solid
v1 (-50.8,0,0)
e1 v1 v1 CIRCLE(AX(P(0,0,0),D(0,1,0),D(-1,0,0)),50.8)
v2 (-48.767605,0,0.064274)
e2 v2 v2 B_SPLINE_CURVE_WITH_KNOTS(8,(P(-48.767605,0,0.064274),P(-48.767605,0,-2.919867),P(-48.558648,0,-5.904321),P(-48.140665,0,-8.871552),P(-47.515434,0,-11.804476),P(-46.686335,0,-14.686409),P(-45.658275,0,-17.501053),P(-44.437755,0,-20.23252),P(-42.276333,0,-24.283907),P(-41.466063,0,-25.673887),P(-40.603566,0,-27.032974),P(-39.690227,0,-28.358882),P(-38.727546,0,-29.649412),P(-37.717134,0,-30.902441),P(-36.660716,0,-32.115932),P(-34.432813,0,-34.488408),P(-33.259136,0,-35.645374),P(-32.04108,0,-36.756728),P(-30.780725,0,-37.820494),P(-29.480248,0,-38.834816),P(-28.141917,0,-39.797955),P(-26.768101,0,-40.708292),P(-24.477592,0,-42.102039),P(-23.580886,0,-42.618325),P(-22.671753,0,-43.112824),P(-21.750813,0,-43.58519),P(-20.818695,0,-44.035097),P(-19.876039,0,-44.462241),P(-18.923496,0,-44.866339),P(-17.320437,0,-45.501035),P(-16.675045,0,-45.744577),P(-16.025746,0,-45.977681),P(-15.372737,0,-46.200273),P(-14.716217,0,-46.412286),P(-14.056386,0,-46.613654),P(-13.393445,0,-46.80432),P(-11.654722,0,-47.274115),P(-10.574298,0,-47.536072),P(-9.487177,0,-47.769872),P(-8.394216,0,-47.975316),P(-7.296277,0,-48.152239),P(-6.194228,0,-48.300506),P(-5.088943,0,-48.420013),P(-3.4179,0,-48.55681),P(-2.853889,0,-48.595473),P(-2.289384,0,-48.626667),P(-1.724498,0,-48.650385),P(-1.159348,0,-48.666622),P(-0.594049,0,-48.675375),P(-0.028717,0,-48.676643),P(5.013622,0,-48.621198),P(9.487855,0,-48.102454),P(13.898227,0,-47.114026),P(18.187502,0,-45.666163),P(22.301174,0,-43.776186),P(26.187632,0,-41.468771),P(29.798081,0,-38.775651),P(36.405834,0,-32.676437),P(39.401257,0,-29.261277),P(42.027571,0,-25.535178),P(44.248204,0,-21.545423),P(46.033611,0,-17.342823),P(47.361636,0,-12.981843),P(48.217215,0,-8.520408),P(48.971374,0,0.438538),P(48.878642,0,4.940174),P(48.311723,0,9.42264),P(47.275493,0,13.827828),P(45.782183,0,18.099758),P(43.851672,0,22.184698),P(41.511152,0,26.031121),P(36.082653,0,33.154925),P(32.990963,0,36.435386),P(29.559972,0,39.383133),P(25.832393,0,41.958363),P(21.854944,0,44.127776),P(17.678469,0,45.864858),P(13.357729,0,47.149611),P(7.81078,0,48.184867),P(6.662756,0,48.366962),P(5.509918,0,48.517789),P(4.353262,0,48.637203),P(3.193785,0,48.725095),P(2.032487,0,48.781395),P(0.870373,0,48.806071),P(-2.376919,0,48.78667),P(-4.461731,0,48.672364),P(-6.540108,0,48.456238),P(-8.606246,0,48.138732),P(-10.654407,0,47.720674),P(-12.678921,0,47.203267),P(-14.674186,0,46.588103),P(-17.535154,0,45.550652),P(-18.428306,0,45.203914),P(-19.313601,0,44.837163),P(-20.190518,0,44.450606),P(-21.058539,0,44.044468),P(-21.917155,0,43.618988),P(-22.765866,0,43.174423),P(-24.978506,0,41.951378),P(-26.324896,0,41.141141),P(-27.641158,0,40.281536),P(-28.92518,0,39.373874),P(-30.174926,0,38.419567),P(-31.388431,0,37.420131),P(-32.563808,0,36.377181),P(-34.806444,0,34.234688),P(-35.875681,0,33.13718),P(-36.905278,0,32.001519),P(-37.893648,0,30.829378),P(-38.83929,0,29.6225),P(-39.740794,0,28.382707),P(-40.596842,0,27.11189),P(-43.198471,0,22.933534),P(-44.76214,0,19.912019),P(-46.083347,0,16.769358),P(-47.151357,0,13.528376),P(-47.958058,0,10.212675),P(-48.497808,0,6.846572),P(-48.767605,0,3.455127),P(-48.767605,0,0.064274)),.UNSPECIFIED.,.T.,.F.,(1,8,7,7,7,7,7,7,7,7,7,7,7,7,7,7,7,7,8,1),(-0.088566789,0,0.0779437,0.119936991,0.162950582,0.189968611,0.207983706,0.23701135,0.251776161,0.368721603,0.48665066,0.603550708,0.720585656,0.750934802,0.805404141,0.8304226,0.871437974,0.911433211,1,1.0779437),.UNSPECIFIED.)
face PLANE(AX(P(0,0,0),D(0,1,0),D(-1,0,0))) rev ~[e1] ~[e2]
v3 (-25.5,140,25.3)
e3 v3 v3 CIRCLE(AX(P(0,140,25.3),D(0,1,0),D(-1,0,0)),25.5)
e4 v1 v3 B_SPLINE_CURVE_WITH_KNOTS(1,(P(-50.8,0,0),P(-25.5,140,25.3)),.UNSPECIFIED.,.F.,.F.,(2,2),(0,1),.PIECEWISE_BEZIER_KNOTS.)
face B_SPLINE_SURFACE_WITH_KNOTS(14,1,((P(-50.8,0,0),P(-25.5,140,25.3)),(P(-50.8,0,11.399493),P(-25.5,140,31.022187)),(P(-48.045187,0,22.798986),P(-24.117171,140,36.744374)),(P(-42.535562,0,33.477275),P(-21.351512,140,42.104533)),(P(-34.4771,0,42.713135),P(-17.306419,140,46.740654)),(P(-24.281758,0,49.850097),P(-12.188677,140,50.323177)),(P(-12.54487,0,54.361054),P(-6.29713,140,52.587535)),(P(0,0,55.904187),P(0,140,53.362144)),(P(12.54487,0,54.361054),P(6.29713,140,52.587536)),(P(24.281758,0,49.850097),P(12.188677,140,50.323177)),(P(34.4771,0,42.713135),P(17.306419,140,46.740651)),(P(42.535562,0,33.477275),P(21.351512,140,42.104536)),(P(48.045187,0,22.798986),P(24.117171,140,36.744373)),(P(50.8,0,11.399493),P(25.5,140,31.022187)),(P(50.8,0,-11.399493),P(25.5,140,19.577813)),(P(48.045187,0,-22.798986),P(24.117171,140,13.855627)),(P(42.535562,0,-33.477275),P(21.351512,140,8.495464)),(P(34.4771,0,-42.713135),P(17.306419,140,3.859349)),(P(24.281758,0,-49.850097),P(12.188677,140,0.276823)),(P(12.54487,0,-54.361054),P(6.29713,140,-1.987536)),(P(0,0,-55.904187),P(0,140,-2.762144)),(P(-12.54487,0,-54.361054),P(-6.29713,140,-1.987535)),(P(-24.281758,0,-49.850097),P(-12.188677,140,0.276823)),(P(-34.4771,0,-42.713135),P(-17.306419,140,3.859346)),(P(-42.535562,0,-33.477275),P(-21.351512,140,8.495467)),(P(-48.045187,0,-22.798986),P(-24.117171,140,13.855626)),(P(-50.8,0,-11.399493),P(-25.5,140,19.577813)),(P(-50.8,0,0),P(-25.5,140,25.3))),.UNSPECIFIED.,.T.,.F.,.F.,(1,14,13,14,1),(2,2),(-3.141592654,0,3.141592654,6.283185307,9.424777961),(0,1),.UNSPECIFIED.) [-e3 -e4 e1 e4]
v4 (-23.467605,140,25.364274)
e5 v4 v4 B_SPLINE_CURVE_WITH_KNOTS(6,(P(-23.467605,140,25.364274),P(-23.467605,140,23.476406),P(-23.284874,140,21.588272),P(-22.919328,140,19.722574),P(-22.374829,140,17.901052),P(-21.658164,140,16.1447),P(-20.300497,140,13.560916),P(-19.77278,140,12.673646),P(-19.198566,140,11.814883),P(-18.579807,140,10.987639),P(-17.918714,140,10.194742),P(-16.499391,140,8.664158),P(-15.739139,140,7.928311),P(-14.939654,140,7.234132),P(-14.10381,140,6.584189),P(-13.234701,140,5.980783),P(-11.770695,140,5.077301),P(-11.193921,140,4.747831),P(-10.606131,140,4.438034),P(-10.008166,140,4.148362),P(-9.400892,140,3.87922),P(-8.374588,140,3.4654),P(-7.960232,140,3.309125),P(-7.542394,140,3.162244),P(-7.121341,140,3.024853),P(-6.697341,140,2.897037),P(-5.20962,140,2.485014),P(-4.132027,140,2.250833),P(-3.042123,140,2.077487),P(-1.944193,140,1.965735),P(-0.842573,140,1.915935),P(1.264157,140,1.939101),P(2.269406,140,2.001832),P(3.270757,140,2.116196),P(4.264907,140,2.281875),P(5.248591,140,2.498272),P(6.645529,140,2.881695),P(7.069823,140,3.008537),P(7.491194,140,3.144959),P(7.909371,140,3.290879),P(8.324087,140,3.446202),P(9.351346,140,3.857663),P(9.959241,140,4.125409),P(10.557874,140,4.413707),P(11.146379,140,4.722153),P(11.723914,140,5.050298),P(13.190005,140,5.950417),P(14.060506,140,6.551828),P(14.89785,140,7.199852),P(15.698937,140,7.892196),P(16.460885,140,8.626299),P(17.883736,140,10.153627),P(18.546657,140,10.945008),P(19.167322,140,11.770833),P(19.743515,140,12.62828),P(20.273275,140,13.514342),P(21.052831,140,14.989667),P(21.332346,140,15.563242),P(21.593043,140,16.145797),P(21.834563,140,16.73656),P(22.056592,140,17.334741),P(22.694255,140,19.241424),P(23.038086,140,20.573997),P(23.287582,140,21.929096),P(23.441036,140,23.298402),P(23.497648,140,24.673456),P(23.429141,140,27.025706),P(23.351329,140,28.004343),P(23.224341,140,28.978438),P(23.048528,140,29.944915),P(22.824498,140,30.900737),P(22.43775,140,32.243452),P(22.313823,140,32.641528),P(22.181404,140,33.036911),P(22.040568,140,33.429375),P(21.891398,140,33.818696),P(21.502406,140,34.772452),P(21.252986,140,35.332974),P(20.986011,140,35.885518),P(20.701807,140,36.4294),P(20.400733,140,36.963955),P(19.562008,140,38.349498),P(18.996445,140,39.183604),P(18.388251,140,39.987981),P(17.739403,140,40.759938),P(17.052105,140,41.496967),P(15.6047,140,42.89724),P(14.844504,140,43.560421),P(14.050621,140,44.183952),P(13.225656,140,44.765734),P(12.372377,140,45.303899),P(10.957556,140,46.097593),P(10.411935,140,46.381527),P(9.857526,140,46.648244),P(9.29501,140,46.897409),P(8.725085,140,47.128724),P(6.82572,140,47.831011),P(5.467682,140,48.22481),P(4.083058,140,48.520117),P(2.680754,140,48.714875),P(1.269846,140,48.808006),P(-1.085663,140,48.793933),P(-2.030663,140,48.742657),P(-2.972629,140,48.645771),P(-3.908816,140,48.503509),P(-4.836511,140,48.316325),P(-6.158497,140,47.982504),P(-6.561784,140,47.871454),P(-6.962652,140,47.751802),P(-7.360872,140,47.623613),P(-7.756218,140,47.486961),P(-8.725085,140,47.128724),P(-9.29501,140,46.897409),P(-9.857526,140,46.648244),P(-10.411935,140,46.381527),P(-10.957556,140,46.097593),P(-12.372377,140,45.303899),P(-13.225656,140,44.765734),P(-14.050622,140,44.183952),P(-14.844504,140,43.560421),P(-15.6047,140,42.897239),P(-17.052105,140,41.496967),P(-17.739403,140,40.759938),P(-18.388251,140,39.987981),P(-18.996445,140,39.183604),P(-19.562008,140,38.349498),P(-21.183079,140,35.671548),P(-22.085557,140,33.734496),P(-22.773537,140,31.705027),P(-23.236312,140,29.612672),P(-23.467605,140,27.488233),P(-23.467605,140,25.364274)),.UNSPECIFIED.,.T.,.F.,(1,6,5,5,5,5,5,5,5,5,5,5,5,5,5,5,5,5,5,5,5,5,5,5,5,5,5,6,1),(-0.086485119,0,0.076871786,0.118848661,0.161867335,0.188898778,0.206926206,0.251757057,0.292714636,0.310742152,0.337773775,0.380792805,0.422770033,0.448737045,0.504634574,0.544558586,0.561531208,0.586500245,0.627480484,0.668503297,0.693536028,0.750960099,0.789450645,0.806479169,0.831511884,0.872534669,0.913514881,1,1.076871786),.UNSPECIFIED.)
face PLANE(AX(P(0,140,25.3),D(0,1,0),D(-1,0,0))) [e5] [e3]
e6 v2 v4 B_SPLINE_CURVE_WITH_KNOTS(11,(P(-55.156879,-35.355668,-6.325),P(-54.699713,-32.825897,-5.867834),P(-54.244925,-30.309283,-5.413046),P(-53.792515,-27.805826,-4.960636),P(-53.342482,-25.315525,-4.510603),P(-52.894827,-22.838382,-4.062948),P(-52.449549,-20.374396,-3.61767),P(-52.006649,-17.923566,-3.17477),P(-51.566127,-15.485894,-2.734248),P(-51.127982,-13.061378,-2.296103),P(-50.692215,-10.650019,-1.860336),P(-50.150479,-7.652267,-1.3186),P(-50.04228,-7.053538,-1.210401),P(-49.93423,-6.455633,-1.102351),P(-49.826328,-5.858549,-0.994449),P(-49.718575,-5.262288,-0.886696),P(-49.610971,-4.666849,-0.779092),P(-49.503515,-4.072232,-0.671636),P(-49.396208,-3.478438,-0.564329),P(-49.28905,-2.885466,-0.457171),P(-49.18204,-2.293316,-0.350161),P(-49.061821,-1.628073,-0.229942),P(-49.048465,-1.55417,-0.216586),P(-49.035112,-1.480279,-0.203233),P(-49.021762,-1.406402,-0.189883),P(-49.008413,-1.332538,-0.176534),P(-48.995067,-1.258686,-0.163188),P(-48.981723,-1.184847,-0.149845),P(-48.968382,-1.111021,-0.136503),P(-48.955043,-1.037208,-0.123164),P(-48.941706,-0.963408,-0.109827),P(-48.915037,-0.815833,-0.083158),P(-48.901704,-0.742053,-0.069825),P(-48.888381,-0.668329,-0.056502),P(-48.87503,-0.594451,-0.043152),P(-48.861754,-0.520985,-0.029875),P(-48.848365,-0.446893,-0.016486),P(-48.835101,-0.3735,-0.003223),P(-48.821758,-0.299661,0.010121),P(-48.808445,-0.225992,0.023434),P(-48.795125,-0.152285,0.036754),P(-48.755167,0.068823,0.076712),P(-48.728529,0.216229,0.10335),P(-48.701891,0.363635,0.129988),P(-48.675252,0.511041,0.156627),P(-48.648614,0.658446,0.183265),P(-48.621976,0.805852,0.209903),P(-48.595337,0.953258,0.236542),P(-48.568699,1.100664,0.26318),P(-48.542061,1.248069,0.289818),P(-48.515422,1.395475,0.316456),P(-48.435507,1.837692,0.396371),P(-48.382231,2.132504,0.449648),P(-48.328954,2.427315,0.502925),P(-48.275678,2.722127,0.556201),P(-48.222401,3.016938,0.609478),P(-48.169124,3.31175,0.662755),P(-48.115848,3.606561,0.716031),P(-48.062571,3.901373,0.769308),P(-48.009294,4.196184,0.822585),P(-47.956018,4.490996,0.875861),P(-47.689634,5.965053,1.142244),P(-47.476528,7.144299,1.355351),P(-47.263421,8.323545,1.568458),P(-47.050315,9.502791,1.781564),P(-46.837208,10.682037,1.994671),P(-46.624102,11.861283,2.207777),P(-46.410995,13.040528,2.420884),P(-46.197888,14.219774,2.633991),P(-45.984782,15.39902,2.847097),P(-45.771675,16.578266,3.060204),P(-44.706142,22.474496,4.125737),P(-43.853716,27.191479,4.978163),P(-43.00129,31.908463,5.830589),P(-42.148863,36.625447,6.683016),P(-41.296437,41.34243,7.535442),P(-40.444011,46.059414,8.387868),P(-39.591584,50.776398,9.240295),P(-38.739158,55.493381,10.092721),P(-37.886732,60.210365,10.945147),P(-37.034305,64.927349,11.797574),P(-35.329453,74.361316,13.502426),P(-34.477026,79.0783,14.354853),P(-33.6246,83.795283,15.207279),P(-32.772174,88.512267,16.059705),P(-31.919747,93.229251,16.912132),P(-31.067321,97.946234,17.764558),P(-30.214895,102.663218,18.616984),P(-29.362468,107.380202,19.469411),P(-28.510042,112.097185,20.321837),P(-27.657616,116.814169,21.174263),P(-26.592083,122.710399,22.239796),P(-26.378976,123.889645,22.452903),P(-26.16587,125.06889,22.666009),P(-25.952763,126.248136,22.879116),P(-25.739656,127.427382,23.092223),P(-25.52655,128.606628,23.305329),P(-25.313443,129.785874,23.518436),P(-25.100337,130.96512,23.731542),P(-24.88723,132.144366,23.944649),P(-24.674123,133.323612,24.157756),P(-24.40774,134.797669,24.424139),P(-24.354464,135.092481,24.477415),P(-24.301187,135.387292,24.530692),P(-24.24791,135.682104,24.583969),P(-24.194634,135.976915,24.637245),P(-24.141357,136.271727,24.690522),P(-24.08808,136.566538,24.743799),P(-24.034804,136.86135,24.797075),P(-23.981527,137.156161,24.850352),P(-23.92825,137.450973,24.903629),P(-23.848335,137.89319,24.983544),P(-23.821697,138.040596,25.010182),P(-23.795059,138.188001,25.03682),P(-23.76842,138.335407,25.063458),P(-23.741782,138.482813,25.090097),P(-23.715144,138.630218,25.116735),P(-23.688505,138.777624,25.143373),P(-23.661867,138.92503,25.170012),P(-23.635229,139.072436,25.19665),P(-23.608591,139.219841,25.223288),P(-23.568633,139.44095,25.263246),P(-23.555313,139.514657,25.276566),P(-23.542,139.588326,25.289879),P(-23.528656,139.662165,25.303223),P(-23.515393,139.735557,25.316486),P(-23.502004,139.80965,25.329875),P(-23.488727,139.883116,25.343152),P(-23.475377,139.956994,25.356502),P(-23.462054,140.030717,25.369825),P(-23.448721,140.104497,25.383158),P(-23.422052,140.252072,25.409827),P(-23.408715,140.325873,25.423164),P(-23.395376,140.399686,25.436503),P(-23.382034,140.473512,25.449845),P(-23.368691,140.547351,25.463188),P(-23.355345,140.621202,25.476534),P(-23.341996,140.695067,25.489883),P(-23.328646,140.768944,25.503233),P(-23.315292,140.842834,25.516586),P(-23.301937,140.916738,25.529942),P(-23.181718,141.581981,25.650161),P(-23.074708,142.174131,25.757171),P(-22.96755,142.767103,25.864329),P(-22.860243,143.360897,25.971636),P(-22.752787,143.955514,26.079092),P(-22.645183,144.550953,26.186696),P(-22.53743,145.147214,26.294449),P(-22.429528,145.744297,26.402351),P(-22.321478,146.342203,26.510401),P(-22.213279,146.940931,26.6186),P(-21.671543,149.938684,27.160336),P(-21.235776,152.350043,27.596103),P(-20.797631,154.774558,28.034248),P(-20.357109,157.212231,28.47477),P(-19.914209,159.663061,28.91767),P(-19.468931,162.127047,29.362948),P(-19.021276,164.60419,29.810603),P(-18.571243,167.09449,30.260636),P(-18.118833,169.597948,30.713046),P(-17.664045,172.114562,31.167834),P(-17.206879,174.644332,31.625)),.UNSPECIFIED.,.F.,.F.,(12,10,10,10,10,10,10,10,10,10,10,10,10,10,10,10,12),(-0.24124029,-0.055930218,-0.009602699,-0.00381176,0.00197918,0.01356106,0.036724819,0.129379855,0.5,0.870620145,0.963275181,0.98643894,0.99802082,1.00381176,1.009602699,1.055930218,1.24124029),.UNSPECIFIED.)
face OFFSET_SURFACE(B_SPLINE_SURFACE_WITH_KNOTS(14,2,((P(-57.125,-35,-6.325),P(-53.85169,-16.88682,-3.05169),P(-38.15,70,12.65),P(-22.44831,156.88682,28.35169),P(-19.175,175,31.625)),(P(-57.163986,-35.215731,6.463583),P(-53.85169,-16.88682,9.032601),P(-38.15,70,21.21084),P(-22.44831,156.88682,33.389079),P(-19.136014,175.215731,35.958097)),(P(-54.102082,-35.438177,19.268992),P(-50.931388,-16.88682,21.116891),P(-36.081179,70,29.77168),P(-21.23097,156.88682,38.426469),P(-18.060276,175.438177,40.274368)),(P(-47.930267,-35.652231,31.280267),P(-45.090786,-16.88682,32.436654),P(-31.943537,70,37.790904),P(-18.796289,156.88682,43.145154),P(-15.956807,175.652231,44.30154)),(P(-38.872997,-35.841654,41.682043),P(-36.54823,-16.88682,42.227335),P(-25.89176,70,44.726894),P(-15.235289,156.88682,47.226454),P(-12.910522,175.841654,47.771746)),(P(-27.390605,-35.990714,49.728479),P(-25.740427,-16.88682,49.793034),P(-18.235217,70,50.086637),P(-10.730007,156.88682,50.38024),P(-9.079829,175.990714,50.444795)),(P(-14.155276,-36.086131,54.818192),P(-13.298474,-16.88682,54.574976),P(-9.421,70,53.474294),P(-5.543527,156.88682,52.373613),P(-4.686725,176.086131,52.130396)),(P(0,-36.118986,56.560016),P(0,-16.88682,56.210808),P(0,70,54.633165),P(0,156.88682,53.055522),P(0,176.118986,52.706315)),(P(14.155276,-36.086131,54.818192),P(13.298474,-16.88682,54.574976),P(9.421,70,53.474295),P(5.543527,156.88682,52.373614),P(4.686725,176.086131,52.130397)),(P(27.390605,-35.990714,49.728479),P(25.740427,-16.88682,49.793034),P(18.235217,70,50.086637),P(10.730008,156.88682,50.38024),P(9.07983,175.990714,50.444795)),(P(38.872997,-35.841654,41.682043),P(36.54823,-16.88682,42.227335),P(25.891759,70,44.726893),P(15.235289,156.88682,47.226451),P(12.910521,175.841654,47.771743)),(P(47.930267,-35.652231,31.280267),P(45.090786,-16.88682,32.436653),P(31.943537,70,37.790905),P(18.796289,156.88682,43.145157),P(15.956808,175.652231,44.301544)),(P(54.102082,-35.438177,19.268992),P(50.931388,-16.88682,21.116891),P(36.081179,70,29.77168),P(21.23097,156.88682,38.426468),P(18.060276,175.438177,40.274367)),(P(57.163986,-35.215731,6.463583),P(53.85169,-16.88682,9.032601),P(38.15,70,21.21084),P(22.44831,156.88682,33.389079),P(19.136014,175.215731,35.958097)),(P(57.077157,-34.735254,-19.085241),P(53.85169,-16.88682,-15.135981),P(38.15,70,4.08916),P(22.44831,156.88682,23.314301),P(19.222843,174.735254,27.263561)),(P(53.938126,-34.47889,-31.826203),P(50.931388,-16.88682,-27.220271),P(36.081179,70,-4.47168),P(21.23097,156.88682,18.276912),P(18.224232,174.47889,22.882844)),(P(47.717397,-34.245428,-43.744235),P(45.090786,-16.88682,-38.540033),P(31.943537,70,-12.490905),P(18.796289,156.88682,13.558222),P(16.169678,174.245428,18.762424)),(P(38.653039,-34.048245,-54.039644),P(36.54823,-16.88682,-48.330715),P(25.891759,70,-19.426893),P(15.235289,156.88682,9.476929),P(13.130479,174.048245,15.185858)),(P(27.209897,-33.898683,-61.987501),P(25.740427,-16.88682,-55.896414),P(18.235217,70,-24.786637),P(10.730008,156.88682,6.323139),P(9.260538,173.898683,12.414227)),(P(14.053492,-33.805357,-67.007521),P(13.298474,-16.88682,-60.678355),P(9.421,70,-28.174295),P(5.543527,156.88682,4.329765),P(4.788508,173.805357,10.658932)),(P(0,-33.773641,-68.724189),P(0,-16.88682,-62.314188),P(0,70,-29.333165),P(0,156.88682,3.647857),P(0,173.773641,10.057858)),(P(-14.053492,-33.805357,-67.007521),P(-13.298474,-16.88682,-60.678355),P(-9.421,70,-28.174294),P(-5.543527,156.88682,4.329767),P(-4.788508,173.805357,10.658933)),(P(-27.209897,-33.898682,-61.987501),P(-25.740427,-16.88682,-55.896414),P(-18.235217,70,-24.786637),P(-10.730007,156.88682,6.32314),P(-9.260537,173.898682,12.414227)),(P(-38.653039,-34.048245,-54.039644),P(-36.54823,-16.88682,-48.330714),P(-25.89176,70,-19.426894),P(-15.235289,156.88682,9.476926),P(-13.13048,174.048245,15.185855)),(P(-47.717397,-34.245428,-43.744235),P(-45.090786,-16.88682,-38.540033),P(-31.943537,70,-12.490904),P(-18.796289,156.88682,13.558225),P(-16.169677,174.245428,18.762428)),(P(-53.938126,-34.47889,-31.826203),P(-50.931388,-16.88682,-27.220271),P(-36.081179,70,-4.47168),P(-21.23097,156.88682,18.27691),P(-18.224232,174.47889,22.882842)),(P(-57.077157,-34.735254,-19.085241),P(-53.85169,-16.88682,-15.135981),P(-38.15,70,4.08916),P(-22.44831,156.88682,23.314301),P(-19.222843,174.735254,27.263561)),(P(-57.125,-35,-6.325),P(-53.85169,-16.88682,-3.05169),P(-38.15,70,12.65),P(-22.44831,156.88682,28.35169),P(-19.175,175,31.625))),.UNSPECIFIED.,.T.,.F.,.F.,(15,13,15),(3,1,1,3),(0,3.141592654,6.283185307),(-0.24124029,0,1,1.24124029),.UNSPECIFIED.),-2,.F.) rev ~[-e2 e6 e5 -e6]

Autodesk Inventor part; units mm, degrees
ref_plane "YZ Plane" through (0, 0, 0) normal (1, 0, 0) x (0, 1, 0)
ref_plane "XY Plane" through (0, 0, 0) normal (0, 0, 1) x (1, 0, 0)
sketch "Szkic6" plane through (0, 0, 0) normal (0, 1, 0) x (-1, 0, 0)
  circle A0 centre (0, 0) radius 50.8
  dimension "d33" = 101.6
ref_plane "Płaszczyzna konstrukcyjna1" through (0, 140, 0) normal (0, 1, 0) x (-1, 0, 0)
sketch "Szkic7" plane through (0, 140, 0) normal (0, 1, 0) x (-1, 0, 0)
  circle A0 centre (0, 25.3) radius 25.5
  line L0 (0, -20.3) -> (0, 20.3) construction
  circle A1 centre (0, 0) radius 50.8 construction
  dimension "d35" = 51
loft "Wyciągnięcie złożone1" add profiles "Szkic6", "Szkic7"
shell "Skorupa1" thickness 2 removed faces 2 at (7.5264, 140, 25.4182) at (7.3018, 0, 11.5135)
equation "\"d33\" = OD1"
equation "\"d35\" = OD2"
equation "\"d52\" = THK"
equation "\"SzerokośćGięciaPodcięcia\" = Grubość"
equation "\"RozmiarPodcięciaNarożnika\" = 4 * Grubość"
equation "\"PromieńPrzejścia\" = PromieńGięcia"
equation "\"Rozmiar_promienia_Jacobiego\" = PromieńGięcia"
equation "\"Wielk_odstępu\" = Grubość"
equation "\"d2\" = PromieńGięcia"
equation "\"d23\" = PromieńGięcia"
equation "\"OD1\" = 101.6"
equation "\"OD2\" = 51"
equation "\"THK\" = 2"
equation "\"Grubość\" = 1.5"
equation "\"PromieńGięcia\" = 3"
properties part number "Redukcja asymetryczna Ø101,6x51x2 L=140" material "304"
